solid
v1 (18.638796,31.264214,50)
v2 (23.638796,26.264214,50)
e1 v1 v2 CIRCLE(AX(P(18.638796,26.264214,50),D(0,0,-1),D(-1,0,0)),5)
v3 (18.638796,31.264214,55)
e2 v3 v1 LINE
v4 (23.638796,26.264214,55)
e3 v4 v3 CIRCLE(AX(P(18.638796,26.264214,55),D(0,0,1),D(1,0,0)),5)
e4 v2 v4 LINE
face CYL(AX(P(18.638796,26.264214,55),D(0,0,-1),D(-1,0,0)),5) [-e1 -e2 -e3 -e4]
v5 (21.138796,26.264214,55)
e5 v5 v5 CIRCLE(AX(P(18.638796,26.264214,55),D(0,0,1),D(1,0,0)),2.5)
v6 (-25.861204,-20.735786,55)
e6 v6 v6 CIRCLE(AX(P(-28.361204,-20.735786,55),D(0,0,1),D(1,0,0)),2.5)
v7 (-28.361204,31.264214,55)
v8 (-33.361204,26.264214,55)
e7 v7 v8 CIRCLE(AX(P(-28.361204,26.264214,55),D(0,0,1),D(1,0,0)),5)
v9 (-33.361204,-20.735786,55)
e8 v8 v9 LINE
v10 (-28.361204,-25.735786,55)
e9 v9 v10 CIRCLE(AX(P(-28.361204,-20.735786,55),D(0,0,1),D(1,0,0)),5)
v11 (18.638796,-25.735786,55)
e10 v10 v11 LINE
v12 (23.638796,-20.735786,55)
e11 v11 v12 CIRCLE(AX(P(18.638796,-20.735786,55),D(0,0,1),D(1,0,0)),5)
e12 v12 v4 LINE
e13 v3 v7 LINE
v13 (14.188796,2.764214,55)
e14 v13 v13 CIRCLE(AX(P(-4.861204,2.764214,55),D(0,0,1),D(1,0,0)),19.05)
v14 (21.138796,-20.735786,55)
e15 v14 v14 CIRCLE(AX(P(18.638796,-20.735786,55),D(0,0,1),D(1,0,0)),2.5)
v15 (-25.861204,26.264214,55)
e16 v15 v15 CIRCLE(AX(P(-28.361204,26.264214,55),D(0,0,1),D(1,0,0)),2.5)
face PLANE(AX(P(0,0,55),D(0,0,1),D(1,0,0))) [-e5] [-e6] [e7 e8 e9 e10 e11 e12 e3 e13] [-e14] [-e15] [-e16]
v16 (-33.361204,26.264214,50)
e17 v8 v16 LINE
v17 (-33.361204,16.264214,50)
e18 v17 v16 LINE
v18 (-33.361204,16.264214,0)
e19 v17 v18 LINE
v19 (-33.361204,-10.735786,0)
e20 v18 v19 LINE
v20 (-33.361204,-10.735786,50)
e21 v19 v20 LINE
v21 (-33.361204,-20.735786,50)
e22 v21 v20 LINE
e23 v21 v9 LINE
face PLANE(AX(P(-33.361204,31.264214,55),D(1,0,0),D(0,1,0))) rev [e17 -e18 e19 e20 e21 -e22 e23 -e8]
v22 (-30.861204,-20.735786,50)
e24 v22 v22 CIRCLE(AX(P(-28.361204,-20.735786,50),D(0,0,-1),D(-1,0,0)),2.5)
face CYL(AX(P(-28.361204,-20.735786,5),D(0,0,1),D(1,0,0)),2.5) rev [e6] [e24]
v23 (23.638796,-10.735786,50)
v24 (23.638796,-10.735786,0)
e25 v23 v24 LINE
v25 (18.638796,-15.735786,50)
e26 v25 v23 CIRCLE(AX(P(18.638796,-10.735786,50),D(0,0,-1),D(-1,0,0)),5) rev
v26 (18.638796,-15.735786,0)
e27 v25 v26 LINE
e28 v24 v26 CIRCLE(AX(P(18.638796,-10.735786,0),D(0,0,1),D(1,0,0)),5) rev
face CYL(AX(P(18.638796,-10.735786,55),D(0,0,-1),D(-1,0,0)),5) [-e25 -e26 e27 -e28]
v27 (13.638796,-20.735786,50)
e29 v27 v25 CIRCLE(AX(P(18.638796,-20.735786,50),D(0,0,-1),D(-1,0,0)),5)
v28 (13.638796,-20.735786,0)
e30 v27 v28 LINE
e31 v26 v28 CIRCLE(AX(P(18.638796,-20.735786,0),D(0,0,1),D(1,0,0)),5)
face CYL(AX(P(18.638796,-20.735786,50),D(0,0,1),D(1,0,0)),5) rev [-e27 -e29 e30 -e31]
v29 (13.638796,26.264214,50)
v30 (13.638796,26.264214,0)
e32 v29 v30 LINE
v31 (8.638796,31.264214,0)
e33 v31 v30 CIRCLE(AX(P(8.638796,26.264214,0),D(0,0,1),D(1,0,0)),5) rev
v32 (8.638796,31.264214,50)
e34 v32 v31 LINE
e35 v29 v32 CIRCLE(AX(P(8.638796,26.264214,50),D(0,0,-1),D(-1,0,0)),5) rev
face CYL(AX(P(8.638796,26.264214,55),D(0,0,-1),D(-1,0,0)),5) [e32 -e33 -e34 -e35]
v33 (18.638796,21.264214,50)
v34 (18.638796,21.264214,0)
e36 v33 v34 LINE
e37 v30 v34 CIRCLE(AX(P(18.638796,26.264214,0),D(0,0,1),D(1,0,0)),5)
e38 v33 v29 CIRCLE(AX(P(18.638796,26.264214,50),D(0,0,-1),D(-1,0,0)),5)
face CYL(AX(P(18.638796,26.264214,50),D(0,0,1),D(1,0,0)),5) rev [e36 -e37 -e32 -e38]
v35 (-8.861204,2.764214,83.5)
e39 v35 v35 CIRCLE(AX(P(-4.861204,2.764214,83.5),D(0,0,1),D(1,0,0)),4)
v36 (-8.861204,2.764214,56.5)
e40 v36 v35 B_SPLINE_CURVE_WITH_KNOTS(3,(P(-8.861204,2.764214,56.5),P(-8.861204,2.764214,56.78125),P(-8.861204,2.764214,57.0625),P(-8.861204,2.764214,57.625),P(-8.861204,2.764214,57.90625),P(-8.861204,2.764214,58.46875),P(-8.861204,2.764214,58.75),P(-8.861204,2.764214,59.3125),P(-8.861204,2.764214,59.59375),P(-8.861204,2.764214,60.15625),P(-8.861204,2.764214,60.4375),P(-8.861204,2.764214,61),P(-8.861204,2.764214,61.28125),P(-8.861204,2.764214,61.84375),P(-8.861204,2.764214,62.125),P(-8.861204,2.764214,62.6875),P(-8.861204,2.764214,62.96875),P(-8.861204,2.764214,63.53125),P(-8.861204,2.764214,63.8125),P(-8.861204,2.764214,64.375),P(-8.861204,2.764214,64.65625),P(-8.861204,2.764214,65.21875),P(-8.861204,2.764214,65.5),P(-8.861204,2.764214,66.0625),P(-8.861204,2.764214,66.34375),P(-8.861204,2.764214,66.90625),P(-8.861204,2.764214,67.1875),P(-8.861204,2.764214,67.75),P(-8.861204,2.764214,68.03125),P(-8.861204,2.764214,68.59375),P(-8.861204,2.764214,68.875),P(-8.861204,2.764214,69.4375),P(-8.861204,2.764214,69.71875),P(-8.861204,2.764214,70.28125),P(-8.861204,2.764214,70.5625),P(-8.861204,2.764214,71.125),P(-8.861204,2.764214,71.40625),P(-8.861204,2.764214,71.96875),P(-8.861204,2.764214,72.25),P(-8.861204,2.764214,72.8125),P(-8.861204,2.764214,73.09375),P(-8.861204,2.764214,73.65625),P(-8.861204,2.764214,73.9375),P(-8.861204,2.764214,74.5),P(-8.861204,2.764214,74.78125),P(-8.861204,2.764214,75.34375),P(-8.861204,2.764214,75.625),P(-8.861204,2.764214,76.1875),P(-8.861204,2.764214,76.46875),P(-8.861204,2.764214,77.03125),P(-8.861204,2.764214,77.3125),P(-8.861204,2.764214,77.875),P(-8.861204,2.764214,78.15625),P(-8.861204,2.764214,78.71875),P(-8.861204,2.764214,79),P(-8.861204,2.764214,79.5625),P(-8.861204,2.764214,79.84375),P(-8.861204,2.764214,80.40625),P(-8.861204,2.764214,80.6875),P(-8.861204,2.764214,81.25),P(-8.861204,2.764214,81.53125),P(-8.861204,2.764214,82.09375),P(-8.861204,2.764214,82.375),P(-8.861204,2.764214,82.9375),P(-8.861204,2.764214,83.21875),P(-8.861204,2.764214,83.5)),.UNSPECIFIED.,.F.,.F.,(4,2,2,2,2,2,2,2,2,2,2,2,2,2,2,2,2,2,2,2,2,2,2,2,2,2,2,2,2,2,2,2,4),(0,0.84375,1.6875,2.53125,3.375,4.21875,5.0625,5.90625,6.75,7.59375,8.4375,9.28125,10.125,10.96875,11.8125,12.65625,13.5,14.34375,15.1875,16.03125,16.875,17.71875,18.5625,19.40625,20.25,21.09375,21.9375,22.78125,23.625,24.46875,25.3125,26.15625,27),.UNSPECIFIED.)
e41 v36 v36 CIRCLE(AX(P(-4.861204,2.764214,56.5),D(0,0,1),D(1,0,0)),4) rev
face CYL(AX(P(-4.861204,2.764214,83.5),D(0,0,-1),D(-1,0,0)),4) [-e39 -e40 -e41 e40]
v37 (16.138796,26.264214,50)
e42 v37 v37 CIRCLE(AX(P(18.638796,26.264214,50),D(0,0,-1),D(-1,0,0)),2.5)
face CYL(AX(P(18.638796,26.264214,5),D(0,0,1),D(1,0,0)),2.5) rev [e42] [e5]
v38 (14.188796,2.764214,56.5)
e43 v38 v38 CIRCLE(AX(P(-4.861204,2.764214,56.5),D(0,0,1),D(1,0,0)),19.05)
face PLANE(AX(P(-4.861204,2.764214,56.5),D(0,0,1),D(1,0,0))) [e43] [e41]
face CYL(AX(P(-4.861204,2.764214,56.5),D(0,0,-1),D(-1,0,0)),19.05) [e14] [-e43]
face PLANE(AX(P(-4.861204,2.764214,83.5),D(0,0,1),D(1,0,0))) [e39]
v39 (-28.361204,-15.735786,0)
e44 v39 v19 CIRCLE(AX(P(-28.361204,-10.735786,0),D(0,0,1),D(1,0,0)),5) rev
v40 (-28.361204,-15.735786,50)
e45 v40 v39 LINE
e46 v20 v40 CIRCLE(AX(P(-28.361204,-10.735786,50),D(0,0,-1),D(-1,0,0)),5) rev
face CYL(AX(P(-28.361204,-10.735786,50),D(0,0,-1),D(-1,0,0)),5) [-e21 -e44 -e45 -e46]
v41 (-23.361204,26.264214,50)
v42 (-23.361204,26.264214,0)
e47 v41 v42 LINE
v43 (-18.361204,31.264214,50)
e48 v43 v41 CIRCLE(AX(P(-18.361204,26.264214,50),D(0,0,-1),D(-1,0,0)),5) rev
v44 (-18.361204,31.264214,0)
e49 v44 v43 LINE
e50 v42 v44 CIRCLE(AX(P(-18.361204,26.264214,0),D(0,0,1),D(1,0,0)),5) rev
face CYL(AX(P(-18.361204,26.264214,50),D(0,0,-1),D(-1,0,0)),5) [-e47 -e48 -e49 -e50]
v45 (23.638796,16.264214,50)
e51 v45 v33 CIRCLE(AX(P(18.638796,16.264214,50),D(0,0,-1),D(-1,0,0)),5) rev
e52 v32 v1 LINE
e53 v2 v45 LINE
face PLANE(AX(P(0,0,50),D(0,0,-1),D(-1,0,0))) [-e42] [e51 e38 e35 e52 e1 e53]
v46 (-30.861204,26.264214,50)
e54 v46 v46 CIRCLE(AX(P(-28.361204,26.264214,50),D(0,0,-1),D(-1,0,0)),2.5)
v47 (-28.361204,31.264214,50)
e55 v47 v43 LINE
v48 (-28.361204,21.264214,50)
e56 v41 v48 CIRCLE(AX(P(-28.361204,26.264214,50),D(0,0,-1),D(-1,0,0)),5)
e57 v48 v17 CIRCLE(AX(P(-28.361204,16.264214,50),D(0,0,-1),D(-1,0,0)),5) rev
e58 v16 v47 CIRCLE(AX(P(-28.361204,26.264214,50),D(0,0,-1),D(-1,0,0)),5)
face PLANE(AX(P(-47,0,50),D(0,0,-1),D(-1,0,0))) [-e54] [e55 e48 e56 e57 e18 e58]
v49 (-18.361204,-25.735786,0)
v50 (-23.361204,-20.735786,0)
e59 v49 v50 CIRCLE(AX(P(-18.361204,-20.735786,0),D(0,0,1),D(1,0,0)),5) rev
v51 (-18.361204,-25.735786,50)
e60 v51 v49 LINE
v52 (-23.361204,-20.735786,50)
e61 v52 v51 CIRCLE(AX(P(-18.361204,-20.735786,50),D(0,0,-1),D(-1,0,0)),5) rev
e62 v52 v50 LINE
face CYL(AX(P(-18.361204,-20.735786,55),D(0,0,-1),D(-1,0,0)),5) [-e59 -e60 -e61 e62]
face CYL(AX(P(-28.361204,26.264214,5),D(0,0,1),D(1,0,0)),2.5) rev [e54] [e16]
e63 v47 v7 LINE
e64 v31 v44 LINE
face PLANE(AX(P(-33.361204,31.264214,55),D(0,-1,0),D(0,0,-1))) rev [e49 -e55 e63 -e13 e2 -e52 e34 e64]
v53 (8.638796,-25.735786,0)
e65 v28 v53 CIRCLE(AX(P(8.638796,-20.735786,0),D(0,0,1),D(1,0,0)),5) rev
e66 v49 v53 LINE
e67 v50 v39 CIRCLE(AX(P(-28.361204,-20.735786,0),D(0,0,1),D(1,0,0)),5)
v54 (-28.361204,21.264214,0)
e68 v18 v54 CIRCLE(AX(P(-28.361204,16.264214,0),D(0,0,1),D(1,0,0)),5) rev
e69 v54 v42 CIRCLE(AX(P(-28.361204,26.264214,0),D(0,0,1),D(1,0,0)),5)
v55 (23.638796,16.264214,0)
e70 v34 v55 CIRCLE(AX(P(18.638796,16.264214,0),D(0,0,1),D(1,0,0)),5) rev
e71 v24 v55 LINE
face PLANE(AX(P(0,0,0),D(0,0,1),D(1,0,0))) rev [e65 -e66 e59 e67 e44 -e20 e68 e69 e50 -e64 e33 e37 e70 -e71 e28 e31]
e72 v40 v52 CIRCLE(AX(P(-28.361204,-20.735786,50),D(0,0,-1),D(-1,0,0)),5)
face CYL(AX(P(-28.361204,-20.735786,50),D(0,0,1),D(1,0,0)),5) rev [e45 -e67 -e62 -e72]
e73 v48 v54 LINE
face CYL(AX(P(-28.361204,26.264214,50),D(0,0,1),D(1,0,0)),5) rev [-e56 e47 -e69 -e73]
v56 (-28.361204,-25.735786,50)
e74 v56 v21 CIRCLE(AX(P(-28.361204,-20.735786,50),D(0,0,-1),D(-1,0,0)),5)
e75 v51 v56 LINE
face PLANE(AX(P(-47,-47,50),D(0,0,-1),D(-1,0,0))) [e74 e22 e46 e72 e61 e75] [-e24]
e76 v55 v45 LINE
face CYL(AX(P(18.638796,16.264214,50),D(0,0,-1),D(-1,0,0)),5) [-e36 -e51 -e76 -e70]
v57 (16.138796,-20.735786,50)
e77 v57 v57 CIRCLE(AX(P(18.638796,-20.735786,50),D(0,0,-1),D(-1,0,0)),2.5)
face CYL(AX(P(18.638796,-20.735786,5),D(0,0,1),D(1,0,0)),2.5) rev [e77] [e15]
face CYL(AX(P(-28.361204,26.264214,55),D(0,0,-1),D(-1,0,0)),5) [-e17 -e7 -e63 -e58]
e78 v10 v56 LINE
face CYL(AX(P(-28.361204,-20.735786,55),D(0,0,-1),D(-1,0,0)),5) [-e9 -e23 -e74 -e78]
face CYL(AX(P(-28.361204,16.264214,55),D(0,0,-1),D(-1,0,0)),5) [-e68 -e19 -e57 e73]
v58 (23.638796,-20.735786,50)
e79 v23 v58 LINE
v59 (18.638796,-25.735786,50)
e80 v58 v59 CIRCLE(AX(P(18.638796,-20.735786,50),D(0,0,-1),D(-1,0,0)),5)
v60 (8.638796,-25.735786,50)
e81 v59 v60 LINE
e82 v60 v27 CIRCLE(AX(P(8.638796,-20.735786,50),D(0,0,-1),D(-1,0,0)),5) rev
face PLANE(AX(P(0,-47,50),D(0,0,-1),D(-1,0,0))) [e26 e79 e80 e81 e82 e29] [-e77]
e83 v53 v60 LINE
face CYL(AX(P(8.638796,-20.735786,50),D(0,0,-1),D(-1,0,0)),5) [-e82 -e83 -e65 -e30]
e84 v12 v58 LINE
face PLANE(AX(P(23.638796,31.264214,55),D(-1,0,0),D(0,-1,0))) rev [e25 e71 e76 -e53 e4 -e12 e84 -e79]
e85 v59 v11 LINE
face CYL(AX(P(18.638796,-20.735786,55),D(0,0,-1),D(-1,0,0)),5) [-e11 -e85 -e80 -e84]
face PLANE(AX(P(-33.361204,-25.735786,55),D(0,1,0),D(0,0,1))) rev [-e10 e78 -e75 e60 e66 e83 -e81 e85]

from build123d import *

# Parameters (mm, degrees)
SKETCH1_W            = 57
SKETCH1_H            = 57
BOSS_EXTRUDE1_DEPTH  = 55
SKETCH2_W            = 10
SKETCH2_H            = 10
CUT_EXTRUDE1_DEPTH   = 50
LPATTERN1_COUNT      = 2
LPATTERN1_PITCH      = 47
LPATTERN1_COUNT_DIR2 = 2
LPATTERN1_PITCH_DIR2 = 47
SKETCH3_R            = 2.5
CUT_EXTRUDE2_DEPTH   = 50
LPATTERN2_COUNT      = 2
LPATTERN2_PITCH      = 47
LPATTERN2_COUNT_DIR2 = 2
LPATTERN2_PITCH_DIR2 = 47
FILLET1_R            = 5
SKETCH5_R            = 19.05
BOSS_EXTRUDE3_DEPTH  = 1.5
SKETCH4_R            = 4
BOSS_EXTRUDE2_DEPTH  = 28.5


with BuildPart() as part:
    # Sketch1 → Boss-Extrude1 (new body)
    with BuildSketch(Plane.XY):
        with Locations((-4.861204013, 2.764214047)):
            Rectangle(SKETCH1_W, SKETCH1_H)
    extrude(amount=BOSS_EXTRUDE1_DEPTH)

    # Sketch2 → Cut-Extrude1 (cut)
    with BuildSketch(Plane(origin=(0, 0, 0), x_dir=(-1, 0, 0), z_dir=(0, 0, -1))):
        with Locations((-18.638795987, 26.264214047)):
            Rectangle(SKETCH2_W, SKETCH2_H)
    cut_extrude1 = extrude(amount=-CUT_EXTRUDE1_DEPTH, mode=Mode.SUBTRACT)

    # LPattern1: Cut-Extrude1 2 × 2
    with Locations(*[(-i * LPATTERN1_PITCH, -j * LPATTERN1_PITCH_DIR2, 0) for i in range(LPATTERN1_COUNT) for j in range(LPATTERN1_COUNT_DIR2) if (i, j) != (0, 0)]):
        add(cut_extrude1, mode=Mode.SUBTRACT)

    # Sketch3 → Cut-Extrude2 (cut)
    with BuildSketch(Plane.XY.offset(55)):
        with Locations((-28.361204013, 26.264214047)):
            Circle(SKETCH3_R)
    cut_extrude2 = extrude(amount=-CUT_EXTRUDE2_DEPTH, mode=Mode.SUBTRACT)

    # LPattern2: Cut-Extrude2 2 × 2
    with Locations(*[(i * LPATTERN2_PITCH, -j * LPATTERN2_PITCH_DIR2, 0) for i in range(LPATTERN2_COUNT) for j in range(LPATTERN2_COUNT_DIR2) if (i, j) != (0, 0)]):
        add(cut_extrude2, mode=Mode.SUBTRACT)

    # Fillet1
    fillet1_edges = [part.edges().sort_by_distance(p)[0] for p in [
        (-33.361204013, 21.264214047, 25),
        (-23.361204013, 21.264214047, 25),
        (-23.361204013, 31.264214047, 25),
        (13.638795987, 31.264214047, 25),
        (13.638795987, 21.264214047, 25),
        (23.638795987, 21.264214047, 25),
        (23.638795987, -25.735785953, 52.5),
        (23.638795987, -15.735785953, 25),
        (13.638795987, -15.735785953, 25),
        (13.638795987, -25.735785953, 25),
        (-23.361204013, -25.735785953, 25),
        (-23.361204013, -15.735785953, 25),
        (-33.361204013, -15.735785953, 25),
        (-33.361204013, -25.735785953, 52.5),
        (-33.361204013, 31.264214047, 52.5),
        (23.638795987, 31.264214047, 52.5),
    ]]
    fillet(fillet1_edges, radius=FILLET1_R - 0.0001)  # a hair under: the kernel refuses the full size

    # Sketch5 → Boss-Extrude3 (add)
    with BuildSketch(Plane.XY.offset(55)):
        with Locations((-4.861204013, 2.764214047)):
            Circle(SKETCH5_R)
    extrude(amount=BOSS_EXTRUDE3_DEPTH)

    # Sketch4 → Boss-Extrude2 (add)
    with BuildSketch(Plane.XY.offset(55)):
        with Locations(Location((-4.861204013, 2.764214047, 0), (0, 0, 180))):
            Circle(SKETCH4_R)
    extrude(amount=BOSS_EXTRUDE2_DEPTH)


solid = part.part
